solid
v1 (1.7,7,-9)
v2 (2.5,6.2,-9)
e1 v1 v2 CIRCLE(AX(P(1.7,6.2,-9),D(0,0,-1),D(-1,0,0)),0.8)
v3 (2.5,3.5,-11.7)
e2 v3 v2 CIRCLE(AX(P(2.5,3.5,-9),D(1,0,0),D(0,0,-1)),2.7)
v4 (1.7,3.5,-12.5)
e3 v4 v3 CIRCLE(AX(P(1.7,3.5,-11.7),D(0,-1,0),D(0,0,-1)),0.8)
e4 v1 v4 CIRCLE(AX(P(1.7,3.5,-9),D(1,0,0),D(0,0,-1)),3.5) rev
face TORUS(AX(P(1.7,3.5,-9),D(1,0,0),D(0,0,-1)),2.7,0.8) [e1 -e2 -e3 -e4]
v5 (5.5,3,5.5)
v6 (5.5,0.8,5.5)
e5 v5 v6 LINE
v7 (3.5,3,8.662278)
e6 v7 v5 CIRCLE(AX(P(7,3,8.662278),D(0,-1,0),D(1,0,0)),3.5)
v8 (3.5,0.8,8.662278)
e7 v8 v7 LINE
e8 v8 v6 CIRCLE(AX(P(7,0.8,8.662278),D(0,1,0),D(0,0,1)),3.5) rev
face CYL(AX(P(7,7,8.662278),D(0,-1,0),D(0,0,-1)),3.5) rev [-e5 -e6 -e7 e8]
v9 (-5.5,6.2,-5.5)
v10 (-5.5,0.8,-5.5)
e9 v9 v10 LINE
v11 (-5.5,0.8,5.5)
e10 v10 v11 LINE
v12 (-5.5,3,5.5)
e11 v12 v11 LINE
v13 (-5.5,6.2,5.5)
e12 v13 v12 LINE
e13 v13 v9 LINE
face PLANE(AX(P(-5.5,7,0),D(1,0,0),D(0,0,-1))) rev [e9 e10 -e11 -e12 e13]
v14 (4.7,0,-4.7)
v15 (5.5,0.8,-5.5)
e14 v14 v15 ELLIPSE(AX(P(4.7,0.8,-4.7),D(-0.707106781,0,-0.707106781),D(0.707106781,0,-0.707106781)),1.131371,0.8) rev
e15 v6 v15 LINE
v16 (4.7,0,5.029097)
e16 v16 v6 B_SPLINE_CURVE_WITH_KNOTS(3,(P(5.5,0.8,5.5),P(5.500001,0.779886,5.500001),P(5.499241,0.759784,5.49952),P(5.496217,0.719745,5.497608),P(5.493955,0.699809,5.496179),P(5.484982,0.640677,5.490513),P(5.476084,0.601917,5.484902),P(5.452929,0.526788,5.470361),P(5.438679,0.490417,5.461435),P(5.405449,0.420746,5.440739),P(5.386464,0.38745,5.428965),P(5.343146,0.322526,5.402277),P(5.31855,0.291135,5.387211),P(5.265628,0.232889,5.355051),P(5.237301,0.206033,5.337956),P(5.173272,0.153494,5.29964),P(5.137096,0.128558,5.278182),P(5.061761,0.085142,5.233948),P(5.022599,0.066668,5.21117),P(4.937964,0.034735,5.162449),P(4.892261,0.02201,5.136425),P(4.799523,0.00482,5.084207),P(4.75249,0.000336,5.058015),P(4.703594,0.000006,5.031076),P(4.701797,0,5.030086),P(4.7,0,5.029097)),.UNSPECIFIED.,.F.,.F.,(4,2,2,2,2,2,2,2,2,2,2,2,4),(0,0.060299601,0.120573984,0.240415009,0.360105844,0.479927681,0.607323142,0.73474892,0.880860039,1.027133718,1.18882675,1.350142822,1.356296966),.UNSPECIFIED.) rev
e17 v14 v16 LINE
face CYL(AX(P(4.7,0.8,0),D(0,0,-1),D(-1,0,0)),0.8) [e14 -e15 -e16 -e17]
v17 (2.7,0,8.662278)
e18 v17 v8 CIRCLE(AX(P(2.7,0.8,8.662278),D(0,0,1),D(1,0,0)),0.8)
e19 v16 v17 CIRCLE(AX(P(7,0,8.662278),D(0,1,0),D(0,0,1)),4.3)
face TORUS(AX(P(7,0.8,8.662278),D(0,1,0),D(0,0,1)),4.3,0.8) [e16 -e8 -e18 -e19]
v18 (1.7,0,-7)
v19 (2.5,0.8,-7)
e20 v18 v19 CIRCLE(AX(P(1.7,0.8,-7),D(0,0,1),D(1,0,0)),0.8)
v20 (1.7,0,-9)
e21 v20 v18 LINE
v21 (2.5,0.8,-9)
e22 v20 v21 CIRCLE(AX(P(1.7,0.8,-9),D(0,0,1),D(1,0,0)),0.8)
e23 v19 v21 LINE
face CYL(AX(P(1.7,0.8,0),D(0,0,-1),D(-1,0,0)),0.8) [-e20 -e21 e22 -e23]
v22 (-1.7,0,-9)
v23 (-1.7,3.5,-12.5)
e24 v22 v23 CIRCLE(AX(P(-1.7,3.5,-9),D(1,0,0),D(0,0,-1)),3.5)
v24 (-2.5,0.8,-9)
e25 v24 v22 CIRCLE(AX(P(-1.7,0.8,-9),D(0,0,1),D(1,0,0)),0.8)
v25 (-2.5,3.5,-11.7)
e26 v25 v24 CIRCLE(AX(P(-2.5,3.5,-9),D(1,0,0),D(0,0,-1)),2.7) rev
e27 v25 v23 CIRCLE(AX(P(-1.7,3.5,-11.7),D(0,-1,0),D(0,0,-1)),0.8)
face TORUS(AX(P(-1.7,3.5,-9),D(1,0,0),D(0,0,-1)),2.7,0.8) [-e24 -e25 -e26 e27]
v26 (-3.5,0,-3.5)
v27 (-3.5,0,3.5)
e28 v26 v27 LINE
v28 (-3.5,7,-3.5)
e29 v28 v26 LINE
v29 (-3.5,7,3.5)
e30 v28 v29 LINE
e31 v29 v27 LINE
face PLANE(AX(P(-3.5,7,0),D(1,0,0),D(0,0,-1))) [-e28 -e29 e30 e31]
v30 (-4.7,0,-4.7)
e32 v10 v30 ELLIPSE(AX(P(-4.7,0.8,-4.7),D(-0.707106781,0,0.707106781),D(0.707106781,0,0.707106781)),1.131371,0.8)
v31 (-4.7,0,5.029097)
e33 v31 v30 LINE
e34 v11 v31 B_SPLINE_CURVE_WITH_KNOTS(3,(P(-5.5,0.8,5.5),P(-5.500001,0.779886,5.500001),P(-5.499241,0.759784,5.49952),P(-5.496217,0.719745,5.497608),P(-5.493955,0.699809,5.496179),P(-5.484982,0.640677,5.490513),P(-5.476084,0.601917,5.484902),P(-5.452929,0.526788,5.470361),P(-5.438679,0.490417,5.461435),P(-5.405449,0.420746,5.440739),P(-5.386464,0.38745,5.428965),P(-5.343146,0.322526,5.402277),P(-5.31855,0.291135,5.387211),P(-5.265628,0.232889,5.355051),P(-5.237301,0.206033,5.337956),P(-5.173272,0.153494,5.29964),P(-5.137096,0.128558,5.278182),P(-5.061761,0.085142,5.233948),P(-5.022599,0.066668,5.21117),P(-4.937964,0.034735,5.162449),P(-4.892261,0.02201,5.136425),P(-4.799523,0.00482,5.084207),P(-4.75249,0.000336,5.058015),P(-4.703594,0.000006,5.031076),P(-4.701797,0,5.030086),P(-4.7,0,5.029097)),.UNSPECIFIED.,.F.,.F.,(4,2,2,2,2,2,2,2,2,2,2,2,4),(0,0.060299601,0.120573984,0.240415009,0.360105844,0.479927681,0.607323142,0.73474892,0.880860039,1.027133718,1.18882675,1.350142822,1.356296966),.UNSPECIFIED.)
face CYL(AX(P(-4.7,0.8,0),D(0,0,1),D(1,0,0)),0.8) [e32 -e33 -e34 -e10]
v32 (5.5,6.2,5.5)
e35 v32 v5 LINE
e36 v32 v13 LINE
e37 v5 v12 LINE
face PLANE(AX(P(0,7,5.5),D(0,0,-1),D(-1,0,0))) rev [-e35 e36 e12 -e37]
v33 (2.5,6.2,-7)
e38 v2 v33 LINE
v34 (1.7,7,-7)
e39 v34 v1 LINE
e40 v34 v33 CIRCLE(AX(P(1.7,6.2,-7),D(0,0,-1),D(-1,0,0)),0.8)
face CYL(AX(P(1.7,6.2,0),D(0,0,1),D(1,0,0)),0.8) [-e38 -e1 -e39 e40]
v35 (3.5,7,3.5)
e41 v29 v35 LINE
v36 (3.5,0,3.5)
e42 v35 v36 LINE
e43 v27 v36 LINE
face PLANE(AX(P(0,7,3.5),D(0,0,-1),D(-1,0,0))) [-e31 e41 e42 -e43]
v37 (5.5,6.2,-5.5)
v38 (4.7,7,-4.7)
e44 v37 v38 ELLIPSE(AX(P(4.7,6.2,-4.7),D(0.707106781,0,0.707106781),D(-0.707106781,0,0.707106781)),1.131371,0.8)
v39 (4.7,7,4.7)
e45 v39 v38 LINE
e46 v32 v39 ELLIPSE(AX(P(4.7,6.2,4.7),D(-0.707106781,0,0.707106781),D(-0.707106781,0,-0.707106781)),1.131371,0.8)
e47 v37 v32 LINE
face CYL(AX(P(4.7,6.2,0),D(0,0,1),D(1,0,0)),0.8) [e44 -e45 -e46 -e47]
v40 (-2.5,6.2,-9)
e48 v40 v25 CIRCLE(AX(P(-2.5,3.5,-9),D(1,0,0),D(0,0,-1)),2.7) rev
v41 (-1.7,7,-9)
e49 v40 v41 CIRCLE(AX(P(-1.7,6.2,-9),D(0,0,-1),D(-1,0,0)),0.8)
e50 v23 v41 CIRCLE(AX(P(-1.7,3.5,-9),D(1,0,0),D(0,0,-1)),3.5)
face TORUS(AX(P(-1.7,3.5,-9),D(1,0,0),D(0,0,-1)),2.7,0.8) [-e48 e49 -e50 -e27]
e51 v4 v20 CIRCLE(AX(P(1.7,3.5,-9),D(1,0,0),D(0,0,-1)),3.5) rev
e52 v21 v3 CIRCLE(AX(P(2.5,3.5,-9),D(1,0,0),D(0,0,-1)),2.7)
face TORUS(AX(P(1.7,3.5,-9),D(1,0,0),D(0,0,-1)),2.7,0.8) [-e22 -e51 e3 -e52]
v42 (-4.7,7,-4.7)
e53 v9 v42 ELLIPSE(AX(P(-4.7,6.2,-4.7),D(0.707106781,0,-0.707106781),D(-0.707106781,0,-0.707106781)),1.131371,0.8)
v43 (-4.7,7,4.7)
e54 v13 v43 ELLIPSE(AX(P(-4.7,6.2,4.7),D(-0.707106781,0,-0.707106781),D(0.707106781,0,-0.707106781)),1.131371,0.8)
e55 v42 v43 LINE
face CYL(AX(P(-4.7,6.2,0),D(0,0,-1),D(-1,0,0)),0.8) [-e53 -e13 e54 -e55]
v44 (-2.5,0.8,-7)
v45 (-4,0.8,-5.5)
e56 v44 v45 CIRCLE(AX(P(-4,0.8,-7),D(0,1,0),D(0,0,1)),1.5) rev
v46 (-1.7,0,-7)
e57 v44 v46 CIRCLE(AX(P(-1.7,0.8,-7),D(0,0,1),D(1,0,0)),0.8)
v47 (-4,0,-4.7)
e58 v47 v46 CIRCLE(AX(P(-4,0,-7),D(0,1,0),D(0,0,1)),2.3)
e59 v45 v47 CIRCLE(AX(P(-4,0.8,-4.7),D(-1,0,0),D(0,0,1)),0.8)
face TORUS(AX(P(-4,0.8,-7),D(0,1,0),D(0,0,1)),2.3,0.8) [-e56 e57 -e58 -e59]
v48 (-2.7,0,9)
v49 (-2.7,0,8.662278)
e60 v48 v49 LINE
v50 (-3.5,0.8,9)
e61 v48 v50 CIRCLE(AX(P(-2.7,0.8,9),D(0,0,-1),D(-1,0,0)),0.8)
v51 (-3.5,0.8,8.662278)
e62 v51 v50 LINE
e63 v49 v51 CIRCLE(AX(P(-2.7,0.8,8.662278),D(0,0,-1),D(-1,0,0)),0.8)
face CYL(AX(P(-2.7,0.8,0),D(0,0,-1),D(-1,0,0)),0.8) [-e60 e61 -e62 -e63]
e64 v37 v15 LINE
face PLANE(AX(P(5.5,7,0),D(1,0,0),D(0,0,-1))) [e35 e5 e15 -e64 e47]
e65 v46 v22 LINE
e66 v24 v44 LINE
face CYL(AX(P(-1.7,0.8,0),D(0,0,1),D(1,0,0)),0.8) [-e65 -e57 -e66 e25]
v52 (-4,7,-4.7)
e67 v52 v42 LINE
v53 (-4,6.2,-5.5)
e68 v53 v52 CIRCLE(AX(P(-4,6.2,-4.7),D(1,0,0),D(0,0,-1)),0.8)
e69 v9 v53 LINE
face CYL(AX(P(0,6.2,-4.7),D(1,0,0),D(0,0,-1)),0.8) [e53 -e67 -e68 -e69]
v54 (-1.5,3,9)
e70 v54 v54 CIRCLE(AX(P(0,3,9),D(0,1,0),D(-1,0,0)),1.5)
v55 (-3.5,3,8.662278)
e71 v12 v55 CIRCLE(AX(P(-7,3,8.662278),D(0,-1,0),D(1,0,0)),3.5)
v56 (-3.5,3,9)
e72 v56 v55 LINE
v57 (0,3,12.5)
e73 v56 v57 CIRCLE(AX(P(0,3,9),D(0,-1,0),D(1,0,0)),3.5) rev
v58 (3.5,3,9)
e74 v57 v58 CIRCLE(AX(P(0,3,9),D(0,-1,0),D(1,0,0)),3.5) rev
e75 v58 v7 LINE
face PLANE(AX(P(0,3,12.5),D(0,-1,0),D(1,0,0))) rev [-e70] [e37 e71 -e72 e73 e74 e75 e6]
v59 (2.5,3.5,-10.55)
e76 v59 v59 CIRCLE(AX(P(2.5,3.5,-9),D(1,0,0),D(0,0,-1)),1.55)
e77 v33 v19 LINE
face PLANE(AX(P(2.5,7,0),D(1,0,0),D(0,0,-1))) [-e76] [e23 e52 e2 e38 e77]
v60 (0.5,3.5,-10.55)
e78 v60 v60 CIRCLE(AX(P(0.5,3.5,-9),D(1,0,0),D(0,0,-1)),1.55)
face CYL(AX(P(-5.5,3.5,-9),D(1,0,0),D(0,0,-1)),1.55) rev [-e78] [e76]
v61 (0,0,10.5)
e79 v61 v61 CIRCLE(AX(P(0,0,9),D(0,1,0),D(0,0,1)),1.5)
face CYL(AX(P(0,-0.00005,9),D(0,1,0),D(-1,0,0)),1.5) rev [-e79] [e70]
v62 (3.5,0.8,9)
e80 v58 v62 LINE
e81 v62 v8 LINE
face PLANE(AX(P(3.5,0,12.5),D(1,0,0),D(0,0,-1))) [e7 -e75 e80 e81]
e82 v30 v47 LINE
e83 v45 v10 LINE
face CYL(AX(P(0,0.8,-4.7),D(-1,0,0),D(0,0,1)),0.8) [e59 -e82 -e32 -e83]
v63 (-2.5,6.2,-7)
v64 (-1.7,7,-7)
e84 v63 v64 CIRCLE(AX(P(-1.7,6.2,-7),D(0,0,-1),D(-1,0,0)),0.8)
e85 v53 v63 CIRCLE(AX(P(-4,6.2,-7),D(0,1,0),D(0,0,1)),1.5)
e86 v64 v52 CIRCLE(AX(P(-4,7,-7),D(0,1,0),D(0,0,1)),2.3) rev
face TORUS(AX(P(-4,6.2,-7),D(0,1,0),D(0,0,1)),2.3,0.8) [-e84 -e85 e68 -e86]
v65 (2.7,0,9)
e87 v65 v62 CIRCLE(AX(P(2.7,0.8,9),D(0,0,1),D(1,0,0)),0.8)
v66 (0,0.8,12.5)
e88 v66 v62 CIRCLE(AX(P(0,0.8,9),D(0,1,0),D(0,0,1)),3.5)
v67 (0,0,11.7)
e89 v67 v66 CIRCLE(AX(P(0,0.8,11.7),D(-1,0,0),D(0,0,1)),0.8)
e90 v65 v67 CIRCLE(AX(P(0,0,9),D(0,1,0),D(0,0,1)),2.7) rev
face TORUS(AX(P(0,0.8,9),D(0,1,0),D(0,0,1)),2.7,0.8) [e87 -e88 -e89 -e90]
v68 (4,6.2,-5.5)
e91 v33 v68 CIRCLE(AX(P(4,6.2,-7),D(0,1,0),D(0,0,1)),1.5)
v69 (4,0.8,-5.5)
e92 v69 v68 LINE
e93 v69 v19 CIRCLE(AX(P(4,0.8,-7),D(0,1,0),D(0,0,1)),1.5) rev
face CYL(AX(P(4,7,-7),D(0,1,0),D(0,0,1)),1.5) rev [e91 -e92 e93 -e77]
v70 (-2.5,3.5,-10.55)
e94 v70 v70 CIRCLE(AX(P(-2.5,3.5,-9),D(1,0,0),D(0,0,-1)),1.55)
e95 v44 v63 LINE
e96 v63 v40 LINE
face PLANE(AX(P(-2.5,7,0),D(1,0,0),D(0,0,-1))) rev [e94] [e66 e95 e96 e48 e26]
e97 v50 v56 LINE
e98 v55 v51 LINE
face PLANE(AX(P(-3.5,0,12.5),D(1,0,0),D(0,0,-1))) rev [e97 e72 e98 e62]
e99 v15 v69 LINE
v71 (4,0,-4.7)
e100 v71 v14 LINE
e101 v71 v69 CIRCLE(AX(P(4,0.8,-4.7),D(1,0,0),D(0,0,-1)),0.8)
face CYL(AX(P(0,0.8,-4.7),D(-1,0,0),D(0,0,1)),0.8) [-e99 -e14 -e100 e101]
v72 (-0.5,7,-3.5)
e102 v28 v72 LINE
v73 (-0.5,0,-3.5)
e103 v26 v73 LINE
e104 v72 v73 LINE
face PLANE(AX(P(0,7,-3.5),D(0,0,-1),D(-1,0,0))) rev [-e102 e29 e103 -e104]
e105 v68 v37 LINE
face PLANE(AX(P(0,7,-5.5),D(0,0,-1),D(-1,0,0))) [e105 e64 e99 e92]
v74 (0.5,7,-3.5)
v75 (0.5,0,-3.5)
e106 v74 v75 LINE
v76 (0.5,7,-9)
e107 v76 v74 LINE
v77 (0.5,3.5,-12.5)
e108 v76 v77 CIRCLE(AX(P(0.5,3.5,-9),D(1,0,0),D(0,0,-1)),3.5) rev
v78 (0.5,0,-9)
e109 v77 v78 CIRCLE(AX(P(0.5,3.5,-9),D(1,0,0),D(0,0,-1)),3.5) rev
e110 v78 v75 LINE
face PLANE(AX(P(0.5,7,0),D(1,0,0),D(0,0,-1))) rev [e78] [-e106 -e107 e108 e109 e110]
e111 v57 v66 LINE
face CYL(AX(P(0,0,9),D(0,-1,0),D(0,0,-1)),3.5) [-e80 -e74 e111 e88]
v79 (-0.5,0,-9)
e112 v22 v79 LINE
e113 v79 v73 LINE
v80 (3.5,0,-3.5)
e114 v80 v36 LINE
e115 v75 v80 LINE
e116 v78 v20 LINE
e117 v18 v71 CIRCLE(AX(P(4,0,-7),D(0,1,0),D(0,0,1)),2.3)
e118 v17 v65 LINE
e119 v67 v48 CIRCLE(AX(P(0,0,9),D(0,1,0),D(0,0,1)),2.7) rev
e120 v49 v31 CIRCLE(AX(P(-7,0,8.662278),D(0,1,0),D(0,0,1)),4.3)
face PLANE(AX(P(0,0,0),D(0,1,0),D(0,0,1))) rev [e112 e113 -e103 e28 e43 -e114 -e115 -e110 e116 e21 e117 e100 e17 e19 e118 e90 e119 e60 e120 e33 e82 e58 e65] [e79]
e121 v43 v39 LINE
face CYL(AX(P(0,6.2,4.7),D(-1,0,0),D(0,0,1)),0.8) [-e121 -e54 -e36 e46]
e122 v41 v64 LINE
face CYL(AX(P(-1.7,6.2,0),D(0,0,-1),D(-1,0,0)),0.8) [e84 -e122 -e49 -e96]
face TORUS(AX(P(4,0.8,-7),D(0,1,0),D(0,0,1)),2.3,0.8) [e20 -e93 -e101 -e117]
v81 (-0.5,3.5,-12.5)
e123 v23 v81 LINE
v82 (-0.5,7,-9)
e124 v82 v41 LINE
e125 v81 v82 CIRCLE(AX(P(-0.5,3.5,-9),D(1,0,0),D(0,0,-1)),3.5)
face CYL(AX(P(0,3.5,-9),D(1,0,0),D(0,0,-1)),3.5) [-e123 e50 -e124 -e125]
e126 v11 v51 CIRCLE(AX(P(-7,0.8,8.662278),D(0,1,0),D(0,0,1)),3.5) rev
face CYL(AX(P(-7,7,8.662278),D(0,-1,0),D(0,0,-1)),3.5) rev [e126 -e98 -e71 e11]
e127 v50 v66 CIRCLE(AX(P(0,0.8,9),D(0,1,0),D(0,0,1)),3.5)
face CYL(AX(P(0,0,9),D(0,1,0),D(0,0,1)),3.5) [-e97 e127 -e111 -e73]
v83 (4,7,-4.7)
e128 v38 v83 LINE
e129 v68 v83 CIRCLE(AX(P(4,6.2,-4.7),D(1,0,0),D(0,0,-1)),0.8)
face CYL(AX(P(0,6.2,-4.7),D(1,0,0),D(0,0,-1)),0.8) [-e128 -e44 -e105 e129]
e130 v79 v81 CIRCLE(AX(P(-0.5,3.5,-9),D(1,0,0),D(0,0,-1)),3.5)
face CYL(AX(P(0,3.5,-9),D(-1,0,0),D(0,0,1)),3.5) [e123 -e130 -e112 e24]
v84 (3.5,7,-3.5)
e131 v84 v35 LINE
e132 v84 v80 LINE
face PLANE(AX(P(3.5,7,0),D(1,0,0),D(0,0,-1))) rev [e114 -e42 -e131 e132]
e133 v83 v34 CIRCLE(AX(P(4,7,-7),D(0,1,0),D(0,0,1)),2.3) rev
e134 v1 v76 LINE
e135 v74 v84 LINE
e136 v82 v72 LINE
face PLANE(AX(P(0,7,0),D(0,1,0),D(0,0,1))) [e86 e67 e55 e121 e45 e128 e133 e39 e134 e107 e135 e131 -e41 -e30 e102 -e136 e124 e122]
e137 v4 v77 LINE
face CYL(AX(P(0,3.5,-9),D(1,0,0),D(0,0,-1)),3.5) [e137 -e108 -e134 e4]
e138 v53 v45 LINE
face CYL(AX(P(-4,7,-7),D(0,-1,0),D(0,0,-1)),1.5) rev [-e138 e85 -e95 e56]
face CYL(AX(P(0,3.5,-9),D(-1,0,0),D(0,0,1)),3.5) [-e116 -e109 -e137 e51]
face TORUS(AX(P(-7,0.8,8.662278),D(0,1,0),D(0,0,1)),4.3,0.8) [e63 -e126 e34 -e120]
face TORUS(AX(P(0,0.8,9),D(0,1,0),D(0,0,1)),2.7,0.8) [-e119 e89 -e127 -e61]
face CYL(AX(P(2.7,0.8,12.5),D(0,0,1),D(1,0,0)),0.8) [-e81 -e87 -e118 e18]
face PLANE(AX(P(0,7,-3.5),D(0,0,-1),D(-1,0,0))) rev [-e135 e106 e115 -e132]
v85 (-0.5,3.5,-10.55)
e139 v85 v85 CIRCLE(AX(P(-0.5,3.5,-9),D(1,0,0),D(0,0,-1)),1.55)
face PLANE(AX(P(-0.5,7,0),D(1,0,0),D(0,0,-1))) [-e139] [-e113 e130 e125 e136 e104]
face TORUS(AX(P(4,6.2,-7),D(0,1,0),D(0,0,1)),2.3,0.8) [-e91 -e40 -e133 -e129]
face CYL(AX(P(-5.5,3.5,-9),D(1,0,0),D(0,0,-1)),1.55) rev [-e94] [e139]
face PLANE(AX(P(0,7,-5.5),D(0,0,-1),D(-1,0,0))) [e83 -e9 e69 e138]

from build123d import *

# Parameters (mm, degrees)
SKETCH_1_W          = 2
SKETCH_1_H          = 7
EXTRUDE_2_DEPTH     = 7
FILLET_1_R          = 3.5
SKETCH_2_R          = 1.55
CUT_EXTRUDE_1_DEPTH = 17.408839081
SKETCH_3_W          = 3.5
SKETCH_3_H          = 3
EXTRUDE_4_DEPTH     = 7
FILLET_2_R          = 3.5
SKETCH_4_R          = 1.5
CUT_EXTRUDE_2_DEPTH = 15.230249471
FILLET_3_R          = 3.5
FILLET_4_R          = 1.5
FILLET_5_R          = 0.8


# Some blends are built 0.0001 mm under size
with BuildPart() as part:
    # 草图1 → 凸台-拉伸2 (new body)
    with BuildSketch(Plane(origin=(0, 0, 0), x_dir=(1, 0, 0), z_dir=(0, 1, 0))):
        Polygon((-3.5, -3.5), (-3.5, 3.5), (-0.5, 3.5), (-0.5, 5.5), (-2.5, 5.5), (-5.5, 5.5), (-5.5, -5.5), (5.5, -5.5), (5.5, 5.5), (2.5, 5.5), (0.5, 5.5), (0.5, 3.5), (3.5, 3.5), (3.5, -3.5), align=None)
        with Locations((-1.5, 9)):
            Rectangle(SKETCH_1_W, SKETCH_1_H)
        with Locations((1.5, 9)):
            Rectangle(SKETCH_1_W, SKETCH_1_H)
    extrude(amount=EXTRUDE_2_DEPTH)

    # 圆角1
    fillet_1_edges = [part.edges().sort_by_distance(p)[0] for p in [
        (1.5, 7, -12.5),
        (1.5, 0, -12.5),
        (-1.5, 0, -12.5),
        (-1.5, 7, -12.5),
    ]]
    fillet(fillet_1_edges, radius=FILLET_1_R - 0.0001)  # a hair under: the kernel refuses the full size

    # 草图2 → 切除-拉伸1 (cut, through all)
    with BuildSketch(Plane(origin=(2.5, 0, 0), x_dir=(0, 0, -1), z_dir=(1, 0, 0))):
        with Locations((9, 3.5)):
            Circle(SKETCH_2_R)
    extrude(amount=-CUT_EXTRUDE_1_DEPTH, mode=Mode.SUBTRACT)

    # 草图3 → 凸台-拉伸4 (add)
    with BuildSketch(Plane.XY.offset(5.5)):
        with Locations((-1.75, 1.5)):
            Rectangle(SKETCH_3_W, SKETCH_3_H)
        with Locations((1.75, 1.5)):
            Rectangle(SKETCH_3_W, SKETCH_3_H)
    extrude(amount=EXTRUDE_4_DEPTH)

    # 圆角2
    fillet_2_edges = [part.edges().sort_by_distance(p)[0] for p in [
        (3.5, 1.5, 12.5),
        (-3.5, 1.5, 12.5),
    ]]
    fillet(fillet_2_edges, radius=FILLET_2_R - 0.0001)  # a hair under: the kernel refuses the full size

    # 草图4 → 切除-拉伸2 (cut, through all)
    with BuildSketch(Plane(origin=(0, 3, 0), x_dir=(1, 0, 0), z_dir=(0, 1, 0))):
        with Locations(Location((0, -9, 0), (0, 0, 180))):
            Circle(SKETCH_4_R)
    extrude(amount=-CUT_EXTRUDE_2_DEPTH, mode=Mode.SUBTRACT)

    # 圆角3
    # the kernel refuses this fillet: 3.5 mm, written as the material it adds along each edge
    with BuildSketch(Plane(origin=(3.5, 0, 5.5), x_dir=(1, 0, 0), z_dir=(0, 1, 0))) as fillet_3_piece_1:
        with BuildLine():
            CenterArc((3.5, -3.16227766), FILLET_3_R, 115.376933525, 64.623066475)
            Line((0, -3.16227766), (-0.07, -3.16227766))
            Line((-0.07, -3.16227766), (-0.07, 0))
            Line((-0.07, 0), (0, 0.07))
            ThreePointArc((0, 0.07), (1, 0.07), (1.97, 0.063245553))
            Line((1.97, 0.063245553), (2, 0))
        make_face()
    extrude(amount=3)
    with BuildSketch(Plane(origin=(-3.5, 3, 5.5), x_dir=(0, 0, 1), z_dir=(0, -1, 0))) as fillet_3_piece_2:
        with BuildLine():
            CenterArc((3.16227766, 3.5), FILLET_3_R, 205.376933525, 64.623066475)
            Line((0, 2), (-0.063245553, 1.97))
            ThreePointArc((-0.063245553, 1.97), (-0.07, 1), (-0.07, 0))
            Line((-0.07, 0), (0, -0.07))
            Line((0, -0.07), (3.16227766, -0.07))
            Line((3.16227766, -0.07), (3.16227766, 0))
        make_face()
    extrude(amount=3)

    # 圆角4
    fillet_4_edges = [part.edges().sort_by_distance(p)[0] for p in [
        (-2.5, 3.5, -5.5),
        (2.5, 3.5, -5.5),
    ]]
    fillet(fillet_4_edges, radius=FILLET_4_R)

    # 圆角5
    fillet_5_edges = [part.edges().sort_by_distance(p)[0] for p in [
        (4.041960108, 0, 6.791448967),
        (-4.041960108, 0, 6.791448967),
        (4.75, 0, -5.5),
        (4.75, 7, -5.5),
        (-2.939339828, 0, -5.939339828),
        (-2.939339828, 7, -5.939339828),
        (2.939339828, 0, -5.939339828),
        (2.939339828, 7, -5.939339828),
        (5.5, 0, 0),
        (-5.5, 0, 0),
        (-4.75, 0, -5.5),
        (2.5, 0, -8.00005),
        (2.5, 7, -8.00005),
        (2.5, 1.025096977, -11.474903023),
        (2.5, 5.974903023, -11.474903023),
        (-2.5, 7, -8.00005),
        (-2.5, 0, -8.00005),
        (-4.75, 7, -5.5),
        (-2.5, 5.974903023, -11.474903023),
        (-2.5, 1.025096977, -11.474903023),
        (-5.5, 7, 0),
        (0, 7, 5.5),
        (5.5, 7, 0),
        (3.5, 0, 8.83118883),
        (-3.5, 0, 8.83118883),
        (-2.474903023, 0, 11.474903023),
        (2.474903023, 0, 11.474903023),
    ]]
    fillet(fillet_5_edges, radius=FILLET_5_R)


solid = part.part
